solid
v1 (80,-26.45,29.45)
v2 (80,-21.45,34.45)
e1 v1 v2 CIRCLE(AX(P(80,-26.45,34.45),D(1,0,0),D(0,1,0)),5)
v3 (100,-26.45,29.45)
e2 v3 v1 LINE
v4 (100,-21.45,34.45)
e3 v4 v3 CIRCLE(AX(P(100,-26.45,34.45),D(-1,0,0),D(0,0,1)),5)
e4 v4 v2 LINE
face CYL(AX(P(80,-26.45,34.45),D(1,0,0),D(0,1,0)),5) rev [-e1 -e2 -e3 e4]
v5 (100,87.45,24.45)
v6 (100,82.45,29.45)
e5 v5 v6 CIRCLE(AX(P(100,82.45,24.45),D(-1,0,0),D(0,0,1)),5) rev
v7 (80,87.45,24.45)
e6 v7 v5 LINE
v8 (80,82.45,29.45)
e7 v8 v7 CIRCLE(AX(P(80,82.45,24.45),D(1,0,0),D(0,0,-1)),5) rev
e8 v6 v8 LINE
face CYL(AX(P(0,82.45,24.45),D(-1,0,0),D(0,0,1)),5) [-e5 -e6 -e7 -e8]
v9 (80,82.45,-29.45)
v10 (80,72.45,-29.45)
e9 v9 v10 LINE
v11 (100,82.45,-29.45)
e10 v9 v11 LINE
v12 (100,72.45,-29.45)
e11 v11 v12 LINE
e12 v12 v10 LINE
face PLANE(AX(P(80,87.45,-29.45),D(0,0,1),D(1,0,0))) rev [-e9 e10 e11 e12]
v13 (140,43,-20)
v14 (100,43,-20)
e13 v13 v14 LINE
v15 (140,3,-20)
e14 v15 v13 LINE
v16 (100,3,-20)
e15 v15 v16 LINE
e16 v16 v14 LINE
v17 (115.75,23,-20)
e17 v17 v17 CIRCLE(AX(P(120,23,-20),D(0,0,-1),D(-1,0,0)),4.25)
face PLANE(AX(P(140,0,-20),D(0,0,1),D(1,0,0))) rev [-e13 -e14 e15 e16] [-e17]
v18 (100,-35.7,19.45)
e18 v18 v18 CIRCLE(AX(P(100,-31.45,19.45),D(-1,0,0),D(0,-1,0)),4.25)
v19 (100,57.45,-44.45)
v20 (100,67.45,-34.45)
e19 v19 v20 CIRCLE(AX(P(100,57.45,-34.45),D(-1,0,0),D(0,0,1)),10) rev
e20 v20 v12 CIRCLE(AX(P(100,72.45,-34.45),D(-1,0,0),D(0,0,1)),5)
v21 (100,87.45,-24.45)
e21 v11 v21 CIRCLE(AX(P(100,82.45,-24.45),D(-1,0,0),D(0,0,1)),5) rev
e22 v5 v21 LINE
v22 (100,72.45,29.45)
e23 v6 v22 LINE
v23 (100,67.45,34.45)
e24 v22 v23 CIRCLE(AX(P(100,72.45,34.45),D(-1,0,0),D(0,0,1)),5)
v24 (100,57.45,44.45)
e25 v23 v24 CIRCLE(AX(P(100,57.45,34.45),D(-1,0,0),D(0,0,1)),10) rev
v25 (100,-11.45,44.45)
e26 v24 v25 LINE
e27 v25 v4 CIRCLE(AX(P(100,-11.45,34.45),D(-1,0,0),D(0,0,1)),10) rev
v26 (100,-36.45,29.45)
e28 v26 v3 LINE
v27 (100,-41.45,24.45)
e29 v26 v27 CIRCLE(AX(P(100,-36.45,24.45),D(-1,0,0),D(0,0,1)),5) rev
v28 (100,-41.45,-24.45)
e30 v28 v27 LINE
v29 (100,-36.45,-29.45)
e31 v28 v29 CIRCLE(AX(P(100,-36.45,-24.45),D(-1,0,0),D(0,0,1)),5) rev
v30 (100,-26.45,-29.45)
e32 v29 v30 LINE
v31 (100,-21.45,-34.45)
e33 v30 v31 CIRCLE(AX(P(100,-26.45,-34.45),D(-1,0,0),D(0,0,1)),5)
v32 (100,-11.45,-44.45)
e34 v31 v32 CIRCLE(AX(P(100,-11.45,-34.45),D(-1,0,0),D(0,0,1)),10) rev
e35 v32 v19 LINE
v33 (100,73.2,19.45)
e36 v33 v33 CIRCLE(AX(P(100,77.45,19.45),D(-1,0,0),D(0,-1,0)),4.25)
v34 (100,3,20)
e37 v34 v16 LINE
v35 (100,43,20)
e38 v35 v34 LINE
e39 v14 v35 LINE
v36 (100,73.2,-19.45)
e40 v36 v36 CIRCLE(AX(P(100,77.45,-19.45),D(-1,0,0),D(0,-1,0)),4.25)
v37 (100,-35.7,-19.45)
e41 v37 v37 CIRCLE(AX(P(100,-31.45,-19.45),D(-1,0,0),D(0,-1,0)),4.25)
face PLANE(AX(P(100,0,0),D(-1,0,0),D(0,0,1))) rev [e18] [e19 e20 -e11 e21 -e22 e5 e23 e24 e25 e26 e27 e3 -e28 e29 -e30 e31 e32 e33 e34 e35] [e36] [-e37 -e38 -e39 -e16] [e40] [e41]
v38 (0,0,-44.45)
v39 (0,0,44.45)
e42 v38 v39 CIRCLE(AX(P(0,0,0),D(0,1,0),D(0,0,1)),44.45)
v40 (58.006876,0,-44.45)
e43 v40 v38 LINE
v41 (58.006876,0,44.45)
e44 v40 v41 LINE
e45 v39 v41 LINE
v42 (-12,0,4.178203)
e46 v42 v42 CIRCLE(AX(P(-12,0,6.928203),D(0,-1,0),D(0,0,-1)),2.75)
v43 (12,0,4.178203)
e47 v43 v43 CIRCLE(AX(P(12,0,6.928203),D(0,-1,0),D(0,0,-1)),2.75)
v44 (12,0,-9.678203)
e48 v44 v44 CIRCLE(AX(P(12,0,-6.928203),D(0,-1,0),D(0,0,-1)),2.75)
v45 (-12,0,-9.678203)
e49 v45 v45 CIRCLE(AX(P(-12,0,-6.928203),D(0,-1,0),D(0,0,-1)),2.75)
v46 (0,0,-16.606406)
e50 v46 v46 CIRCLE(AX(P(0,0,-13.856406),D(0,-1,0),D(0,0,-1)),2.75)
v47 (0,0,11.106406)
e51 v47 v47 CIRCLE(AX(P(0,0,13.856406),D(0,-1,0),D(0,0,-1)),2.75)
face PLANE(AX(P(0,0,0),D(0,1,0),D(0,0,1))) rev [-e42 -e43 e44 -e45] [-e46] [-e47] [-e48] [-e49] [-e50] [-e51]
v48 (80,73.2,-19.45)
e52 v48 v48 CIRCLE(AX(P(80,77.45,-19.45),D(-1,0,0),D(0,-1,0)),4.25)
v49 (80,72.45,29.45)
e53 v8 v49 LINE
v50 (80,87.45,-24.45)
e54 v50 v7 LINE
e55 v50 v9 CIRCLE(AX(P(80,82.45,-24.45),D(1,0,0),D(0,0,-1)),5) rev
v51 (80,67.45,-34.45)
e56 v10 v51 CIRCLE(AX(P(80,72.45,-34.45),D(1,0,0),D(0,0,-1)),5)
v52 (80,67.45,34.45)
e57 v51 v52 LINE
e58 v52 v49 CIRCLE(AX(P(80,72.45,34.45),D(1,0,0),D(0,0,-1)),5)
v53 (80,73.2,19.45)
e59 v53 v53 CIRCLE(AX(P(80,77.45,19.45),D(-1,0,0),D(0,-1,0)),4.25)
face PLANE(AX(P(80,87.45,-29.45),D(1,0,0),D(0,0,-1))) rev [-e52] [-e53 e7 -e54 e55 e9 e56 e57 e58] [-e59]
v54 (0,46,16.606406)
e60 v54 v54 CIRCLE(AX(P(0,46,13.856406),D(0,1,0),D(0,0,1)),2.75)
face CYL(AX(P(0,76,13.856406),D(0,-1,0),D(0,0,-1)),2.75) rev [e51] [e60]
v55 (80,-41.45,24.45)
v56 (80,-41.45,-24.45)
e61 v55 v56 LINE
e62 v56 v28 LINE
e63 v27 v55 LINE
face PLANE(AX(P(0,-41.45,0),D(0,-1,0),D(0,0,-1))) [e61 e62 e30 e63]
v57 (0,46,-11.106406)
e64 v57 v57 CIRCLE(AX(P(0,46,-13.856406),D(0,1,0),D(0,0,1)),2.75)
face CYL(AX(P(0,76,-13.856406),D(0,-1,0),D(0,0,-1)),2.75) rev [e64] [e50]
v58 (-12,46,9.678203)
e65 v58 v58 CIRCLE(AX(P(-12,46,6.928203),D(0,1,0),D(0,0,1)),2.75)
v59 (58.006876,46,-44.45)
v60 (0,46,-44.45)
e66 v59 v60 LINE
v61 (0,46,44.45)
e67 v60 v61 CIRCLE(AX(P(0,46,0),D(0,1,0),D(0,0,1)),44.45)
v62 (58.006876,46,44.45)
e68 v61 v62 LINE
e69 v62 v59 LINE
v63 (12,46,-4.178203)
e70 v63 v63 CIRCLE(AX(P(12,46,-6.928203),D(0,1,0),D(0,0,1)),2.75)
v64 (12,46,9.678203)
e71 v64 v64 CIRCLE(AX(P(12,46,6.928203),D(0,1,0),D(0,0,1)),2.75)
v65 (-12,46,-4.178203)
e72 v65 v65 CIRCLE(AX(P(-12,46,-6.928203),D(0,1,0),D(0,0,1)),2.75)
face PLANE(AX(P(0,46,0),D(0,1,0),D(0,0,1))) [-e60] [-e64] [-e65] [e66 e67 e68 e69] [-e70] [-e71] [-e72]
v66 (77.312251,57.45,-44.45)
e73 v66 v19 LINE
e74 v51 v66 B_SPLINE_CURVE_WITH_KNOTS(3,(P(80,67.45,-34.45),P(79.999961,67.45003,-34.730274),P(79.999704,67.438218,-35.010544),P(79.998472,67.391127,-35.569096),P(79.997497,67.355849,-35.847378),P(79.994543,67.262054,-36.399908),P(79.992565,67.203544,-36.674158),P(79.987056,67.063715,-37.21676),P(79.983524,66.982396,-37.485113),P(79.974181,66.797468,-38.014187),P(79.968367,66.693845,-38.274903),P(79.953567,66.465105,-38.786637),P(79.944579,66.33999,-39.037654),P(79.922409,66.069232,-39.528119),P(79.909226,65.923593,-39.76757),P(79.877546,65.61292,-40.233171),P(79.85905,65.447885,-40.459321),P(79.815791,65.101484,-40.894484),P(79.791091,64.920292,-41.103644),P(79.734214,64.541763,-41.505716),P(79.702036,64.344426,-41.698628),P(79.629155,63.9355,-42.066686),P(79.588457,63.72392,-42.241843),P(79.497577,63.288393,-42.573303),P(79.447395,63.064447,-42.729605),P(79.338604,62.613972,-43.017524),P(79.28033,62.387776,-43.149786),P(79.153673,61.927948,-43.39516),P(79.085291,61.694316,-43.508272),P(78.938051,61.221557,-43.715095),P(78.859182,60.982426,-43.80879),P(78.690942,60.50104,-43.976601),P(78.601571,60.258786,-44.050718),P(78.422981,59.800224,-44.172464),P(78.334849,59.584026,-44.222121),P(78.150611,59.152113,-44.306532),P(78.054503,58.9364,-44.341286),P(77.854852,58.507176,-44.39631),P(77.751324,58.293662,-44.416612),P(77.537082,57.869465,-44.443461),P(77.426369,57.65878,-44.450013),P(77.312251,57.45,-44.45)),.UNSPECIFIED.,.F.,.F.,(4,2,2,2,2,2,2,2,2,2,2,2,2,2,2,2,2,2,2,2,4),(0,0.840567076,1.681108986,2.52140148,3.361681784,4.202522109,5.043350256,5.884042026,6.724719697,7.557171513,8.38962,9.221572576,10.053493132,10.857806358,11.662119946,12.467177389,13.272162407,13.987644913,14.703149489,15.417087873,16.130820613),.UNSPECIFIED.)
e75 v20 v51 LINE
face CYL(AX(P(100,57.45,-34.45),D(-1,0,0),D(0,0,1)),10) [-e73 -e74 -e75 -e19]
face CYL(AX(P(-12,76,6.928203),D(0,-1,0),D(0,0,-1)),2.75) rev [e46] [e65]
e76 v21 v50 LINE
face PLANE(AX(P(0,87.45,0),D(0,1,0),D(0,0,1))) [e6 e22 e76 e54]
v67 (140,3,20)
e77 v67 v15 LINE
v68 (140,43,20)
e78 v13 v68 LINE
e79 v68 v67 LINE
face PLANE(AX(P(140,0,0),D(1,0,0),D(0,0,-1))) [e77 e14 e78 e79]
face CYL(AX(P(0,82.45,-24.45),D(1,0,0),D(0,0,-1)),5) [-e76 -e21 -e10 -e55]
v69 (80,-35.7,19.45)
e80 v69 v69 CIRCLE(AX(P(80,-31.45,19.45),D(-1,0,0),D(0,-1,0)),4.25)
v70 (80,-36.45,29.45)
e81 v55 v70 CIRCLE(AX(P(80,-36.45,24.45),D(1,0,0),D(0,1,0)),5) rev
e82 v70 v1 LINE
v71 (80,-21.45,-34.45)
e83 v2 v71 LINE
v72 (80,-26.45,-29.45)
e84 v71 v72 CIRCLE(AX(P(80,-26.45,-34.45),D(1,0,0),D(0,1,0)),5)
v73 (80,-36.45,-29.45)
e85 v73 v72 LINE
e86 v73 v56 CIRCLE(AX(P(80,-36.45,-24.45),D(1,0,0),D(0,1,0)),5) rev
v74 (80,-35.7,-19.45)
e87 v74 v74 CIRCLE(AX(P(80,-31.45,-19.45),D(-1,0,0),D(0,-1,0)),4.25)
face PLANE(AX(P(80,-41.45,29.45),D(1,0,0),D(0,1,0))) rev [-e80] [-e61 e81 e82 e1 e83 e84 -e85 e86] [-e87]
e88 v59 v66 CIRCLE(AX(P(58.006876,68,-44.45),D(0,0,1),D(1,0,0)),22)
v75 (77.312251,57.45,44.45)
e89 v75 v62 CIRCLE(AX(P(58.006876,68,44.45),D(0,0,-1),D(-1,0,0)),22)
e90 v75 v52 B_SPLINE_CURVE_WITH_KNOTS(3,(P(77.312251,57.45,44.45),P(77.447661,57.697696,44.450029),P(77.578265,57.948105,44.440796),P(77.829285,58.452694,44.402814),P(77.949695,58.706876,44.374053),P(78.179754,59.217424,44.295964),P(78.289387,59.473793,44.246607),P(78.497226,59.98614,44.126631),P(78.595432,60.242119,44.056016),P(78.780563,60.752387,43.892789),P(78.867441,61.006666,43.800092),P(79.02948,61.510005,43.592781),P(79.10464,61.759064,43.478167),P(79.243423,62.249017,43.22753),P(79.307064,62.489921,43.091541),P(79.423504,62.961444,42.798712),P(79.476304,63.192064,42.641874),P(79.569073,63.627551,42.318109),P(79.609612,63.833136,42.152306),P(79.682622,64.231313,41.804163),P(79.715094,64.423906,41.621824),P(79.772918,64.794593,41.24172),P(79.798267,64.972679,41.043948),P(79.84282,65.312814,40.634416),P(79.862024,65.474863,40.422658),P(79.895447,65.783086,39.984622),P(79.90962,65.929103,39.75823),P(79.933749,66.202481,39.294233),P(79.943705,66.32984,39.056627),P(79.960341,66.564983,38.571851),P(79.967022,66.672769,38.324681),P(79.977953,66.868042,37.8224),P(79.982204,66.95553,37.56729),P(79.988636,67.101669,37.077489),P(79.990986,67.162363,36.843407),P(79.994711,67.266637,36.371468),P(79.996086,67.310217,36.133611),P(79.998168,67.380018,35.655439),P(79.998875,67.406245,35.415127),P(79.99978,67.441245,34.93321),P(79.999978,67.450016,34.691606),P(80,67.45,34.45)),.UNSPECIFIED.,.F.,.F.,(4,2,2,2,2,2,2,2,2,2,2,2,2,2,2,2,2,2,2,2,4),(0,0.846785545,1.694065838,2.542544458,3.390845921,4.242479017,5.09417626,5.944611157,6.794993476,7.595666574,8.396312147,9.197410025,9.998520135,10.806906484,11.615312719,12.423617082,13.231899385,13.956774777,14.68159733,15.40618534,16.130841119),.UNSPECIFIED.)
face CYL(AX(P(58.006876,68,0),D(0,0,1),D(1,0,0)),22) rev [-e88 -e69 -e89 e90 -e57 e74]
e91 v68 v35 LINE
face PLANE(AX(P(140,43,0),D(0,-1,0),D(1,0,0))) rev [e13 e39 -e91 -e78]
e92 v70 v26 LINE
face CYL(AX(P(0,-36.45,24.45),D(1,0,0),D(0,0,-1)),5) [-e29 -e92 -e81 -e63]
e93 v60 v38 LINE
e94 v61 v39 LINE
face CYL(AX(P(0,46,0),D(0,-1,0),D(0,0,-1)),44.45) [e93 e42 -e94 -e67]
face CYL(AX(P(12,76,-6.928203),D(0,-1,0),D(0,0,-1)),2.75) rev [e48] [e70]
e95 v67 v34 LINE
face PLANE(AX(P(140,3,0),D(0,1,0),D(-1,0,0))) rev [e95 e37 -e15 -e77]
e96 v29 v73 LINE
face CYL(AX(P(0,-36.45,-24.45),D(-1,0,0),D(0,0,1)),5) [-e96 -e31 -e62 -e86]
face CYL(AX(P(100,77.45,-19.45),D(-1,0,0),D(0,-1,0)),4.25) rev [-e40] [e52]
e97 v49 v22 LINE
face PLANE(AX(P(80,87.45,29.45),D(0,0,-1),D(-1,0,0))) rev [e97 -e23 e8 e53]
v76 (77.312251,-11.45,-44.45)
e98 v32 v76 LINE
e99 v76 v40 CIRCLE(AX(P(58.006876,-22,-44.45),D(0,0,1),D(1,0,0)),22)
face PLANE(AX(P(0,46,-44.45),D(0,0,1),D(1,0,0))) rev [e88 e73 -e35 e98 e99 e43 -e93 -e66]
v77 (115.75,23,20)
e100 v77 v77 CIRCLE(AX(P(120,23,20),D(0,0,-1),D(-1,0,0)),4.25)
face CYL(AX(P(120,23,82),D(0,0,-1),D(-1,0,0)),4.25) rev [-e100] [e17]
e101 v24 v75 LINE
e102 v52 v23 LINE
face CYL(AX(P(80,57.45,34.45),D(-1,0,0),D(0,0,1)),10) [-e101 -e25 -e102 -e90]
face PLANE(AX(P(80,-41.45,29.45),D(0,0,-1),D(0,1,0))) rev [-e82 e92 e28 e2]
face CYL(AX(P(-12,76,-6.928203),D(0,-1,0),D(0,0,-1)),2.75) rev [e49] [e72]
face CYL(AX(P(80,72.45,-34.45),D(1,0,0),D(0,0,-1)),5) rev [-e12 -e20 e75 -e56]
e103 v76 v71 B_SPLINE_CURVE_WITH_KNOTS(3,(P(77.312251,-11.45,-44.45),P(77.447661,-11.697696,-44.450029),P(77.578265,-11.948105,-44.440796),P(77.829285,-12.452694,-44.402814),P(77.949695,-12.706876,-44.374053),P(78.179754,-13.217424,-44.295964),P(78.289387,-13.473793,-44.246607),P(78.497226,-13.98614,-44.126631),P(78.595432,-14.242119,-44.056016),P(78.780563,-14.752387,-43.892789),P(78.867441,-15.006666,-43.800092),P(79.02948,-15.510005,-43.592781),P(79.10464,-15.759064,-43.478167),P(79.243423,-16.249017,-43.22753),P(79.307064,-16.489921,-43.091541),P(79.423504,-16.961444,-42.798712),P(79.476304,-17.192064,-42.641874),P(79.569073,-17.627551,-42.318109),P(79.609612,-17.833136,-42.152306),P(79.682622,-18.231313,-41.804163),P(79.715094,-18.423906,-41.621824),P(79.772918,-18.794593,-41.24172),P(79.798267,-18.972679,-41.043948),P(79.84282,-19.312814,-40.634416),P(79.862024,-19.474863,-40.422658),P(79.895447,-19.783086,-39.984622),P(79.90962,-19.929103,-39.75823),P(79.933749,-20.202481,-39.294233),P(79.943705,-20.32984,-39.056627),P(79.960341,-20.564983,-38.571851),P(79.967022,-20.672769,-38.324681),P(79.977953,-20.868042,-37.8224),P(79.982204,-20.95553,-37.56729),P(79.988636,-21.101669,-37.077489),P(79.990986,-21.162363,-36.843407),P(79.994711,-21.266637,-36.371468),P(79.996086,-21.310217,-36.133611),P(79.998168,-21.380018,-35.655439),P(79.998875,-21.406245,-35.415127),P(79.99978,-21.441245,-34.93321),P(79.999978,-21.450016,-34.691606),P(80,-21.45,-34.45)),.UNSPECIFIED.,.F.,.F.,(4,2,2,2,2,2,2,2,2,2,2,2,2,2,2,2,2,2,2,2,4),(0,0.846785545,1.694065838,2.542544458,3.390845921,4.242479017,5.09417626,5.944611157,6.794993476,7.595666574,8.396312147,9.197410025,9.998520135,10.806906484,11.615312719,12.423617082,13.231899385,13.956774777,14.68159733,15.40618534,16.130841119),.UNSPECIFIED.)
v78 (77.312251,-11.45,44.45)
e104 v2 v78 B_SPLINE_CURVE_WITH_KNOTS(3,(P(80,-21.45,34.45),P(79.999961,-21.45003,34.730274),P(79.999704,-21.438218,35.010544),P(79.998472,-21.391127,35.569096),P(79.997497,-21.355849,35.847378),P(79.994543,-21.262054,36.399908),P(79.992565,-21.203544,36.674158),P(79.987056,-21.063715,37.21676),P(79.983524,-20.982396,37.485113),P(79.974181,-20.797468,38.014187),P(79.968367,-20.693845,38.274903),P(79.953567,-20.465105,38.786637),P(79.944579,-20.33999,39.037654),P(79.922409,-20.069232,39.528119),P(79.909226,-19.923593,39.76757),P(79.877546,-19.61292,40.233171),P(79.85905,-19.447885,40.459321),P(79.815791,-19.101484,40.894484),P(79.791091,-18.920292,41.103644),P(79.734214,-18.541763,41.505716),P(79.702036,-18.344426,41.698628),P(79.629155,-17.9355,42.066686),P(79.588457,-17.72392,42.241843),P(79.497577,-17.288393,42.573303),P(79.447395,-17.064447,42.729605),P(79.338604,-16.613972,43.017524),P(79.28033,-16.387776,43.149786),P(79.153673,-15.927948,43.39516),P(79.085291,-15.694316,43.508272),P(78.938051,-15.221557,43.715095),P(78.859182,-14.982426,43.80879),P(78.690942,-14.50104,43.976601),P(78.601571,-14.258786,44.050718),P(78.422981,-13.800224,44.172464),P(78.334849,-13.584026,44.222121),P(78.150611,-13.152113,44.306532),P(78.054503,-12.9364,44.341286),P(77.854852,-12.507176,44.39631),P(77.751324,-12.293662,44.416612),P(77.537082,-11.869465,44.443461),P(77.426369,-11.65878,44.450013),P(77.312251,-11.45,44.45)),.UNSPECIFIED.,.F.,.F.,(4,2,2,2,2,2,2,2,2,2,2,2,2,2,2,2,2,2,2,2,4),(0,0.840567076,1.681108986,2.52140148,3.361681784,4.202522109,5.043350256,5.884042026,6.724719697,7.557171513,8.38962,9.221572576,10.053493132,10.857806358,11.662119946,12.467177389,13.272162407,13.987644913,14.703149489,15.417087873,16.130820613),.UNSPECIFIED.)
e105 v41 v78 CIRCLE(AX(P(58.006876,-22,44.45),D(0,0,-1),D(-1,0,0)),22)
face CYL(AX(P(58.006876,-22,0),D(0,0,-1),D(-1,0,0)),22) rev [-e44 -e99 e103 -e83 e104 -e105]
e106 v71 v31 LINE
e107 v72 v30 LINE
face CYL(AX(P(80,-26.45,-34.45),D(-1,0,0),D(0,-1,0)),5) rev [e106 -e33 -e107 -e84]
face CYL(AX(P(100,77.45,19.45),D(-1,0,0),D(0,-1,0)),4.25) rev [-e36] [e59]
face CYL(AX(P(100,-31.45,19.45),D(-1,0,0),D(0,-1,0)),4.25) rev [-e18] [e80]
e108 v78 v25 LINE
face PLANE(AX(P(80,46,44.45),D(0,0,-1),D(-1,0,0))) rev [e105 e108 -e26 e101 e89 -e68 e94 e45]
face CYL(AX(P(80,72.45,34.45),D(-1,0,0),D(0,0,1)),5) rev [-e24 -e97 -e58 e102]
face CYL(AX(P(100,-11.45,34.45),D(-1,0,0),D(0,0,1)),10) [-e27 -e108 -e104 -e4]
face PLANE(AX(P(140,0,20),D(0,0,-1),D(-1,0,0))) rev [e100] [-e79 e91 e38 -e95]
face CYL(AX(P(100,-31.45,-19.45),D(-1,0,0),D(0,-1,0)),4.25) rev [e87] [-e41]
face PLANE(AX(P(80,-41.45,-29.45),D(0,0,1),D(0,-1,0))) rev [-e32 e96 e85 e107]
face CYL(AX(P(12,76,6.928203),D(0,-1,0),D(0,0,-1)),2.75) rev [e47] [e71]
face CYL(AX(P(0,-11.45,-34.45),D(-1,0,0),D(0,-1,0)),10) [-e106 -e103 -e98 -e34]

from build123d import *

# Parameters (mm, degrees)
BOSS_EXTRUDE1_DEPTH = 46
CUT_EXTRUDE2_DEPTH  = 76
SKETCH3_W           = 88.9
SKETCH3_H           = 88.9
BOSS_EXTRUDE2_DEPTH = 20
FILLET1_R           = 22
BOSS_EXTRUDE3_DEPTH = 40
SKETCH7_W           = 20
SKETCH7_H           = 20
BOSS_EXTRUDE4_DEPTH = 20
SKETCH8_W           = 20
SKETCH8_H           = 20
BOSS_EXTRUDE5_DEPTH = 20
FILLET3_R           = 10
SKETCH10_R          = 4.25
CUT_EXTRUDE4_DEPTH  = 20
SKETCH11_R          = 4.25
CUT_EXTRUDE5_DEPTH  = 102
SKETCH12_W          = 18.9
SKETCH12_H          = 20
BOSS_EXTRUDE6_DEPTH = 20
FILLET4_START       = 79
FILLET4_DEPTH       = 22
FILLET4_START_2     = 80
FILLET4_2_DEPTH     = 20


with BuildPart() as part:
    # Sketch1 → Boss-Extrude1 (new body)
    with BuildSketch(Plane(origin=(0, 0, 0), x_dir=(1, 0, 0), z_dir=(0, 1, 0))):
        with BuildLine():
            Line((0, 44.45), (80, 44.45))
            Line((80, 44.45), (80, -44.45))
            Line((80, -44.45), (0, -44.45))
            ThreePointArc((0, -44.45), (-44.45, 0), (0, 44.45))
        make_face()
    extrude(amount=BOSS_EXTRUDE1_DEPTH)

    # Sketch2 → Cut-Extrude2 (cut)
    with BuildSketch(Plane(origin=(0, 0, 0), x_dir=(-1, 0, 0), z_dir=(0, -1, 0))):
        with BuildLine():
            Line((-2.38156986, -12.481406461), (0, -13.856406461))
            Line((0, -13.856406461), (2.38156986, -12.481406461))
            ThreePointArc((2.38156986, -12.481406461), (0, -11.106406461), (-2.38156986, -12.481406461))
        make_face()
        with BuildLine():
            Line((2.38156986, -12.481406461), (0, -13.856406461))
            Line((0, -13.856406461), (-2.38156986, -12.481406461))
            ThreePointArc((-2.38156986, -12.481406461), (-0.711752374, -16.512702483), (2.75, -13.856406461))
            ThreePointArc((2.75, -13.856406461), (2.656296022, -13.144654087), (2.38156986, -12.481406461))
        make_face()
        with BuildLine():
            ThreePointArc((-12, -4.17820323), (-14.38156986, -8.30320323), (-9.61843014, -8.30320323))
            Line((-9.61843014, -8.30320323), (-12, -6.92820323))
            Line((-12, -6.92820323), (-12, -4.17820323))
        make_face()
        with BuildLine():
            Line((-12, -6.92820323), (-9.61843014, -8.30320323))
            ThreePointArc((-9.61843014, -8.30320323), (-9.343703978, -7.639955604), (-9.25, -6.92820323))
            ThreePointArc((-9.25, -6.92820323), (-10.055456352, -4.983659582), (-12, -4.17820323))
            Line((-12, -4.17820323), (-12, -6.92820323))
        make_face()
        with BuildLine():
            ThreePointArc((-9.61843014, 8.30320323), (-14.38156986, 8.30320323), (-12, 4.17820323))
            Line((-12, 4.17820323), (-12, 6.92820323))
            Line((-12, 6.92820323), (-9.61843014, 8.30320323))
        make_face()
        with BuildLine():
            Line((-12, 6.92820323), (-12, 4.17820323))
            ThreePointArc((-12, 4.17820323), (-10.055456352, 4.983659582), (-9.25, 6.92820323))
            ThreePointArc((-9.25, 6.92820323), (-9.343703978, 7.639955604), (-9.61843014, 8.30320323))
            Line((-9.61843014, 8.30320323), (-12, 6.92820323))
        make_face()
        with BuildLine():
            ThreePointArc((-2.38156986, 12.481406461), (0, 11.106406461), (2.38156986, 12.481406461))
            Line((2.38156986, 12.481406461), (0, 13.856406461))
            Line((0, 13.856406461), (-2.38156986, 12.481406461))
        make_face()
        with BuildLine():
            Line((0, 13.856406461), (2.38156986, 12.481406461))
            ThreePointArc((2.38156986, 12.481406461), (2.656296022, 13.144654087), (2.75, 13.856406461))
            ThreePointArc((2.75, 13.856406461), (-0.711752374, 16.512702483), (-2.38156986, 12.481406461))
            Line((-2.38156986, 12.481406461), (0, 13.856406461))
        make_face()
        with BuildLine():
            ThreePointArc((9.61843014, 8.30320323), (9.61843014, 5.55320323), (12, 4.17820323))
            Line((12, 4.17820323), (12, 6.92820323))
            Line((12, 6.92820323), (9.61843014, 8.30320323))
        make_face()
        with BuildLine():
            Line((12, 6.92820323), (12, 4.17820323))
            ThreePointArc((12, 4.17820323), (13.944543648, 4.983659582), (14.75, 6.92820323))
            ThreePointArc((14.75, 6.92820323), (12.711752374, 9.584499253), (9.61843014, 8.30320323))
            Line((9.61843014, 8.30320323), (12, 6.92820323))
        make_face()
        with BuildLine():
            ThreePointArc((12, -4.17820323), (9.61843014, -5.55320323), (9.61843014, -8.30320323))
            Line((9.61843014, -8.30320323), (12, -6.92820323))
            Line((12, -6.92820323), (12, -4.17820323))
        make_face()
        with BuildLine():
            Line((12, -6.92820323), (9.61843014, -8.30320323))
            ThreePointArc((9.61843014, -8.30320323), (12.711752374, -9.584499253), (14.75, -6.92820323))
            ThreePointArc((14.75, -6.92820323), (13.944543648, -4.983659582), (12, -4.17820323))
            Line((12, -4.17820323), (12, -6.92820323))
        make_face()
    extrude(amount=-CUT_EXTRUDE2_DEPTH, mode=Mode.SUBTRACT)

    # Sketch3 → Boss-Extrude2 (add)
    with BuildSketch(Plane(origin=(80, 0, 0), x_dir=(0, 0, -1), z_dir=(1, 0, 0))):
        with Locations((0, 23)):
            Rectangle(SKETCH3_W, SKETCH3_H)
    extrude(amount=BOSS_EXTRUDE2_DEPTH)

    # Fillet1
    # the kernel refuses this fillet: 22 mm, written as the material it adds along each edge
    with BuildSketch(Plane(origin=(80, 46, -44.45), x_dir=(0, 1, 0), z_dir=(0, 0, 1))) as fillet1_piece_1:
        with BuildLine():
            CenterArc((22, 21.993123925), FILLET1_R, 180, 88.567456262)
            Line((0, 21.993123925), (-0.44, 21.993123925))
            Line((-0.44, 21.993123925), (-0.44, 0))
            Line((-0.44, 0), (0, -0.44))
            ThreePointArc((0, -0.44), (10.725, -0.44), (21.439, -0.439862479))
            Line((21.439, -0.439862479), (21.45, 0))
        make_face()
    extrude(amount=88.9)
    with BuildSketch(Plane(origin=(80, 0, -44.45), x_dir=(0, -1, 0), z_dir=(0, 0, 1))) as fillet1_piece_2:
        with BuildLine():
            CenterArc((22, -21.993123925), FILLET1_R, 91.432543738, 88.567456262)
            Line((0, -21.993123925), (-0.44, -21.993123925))
            Line((-0.44, -21.993123925), (-0.44, 0))
            Line((-0.44, 0), (0, 0.44))
            ThreePointArc((0, 0.44), (10.725, 0.44), (21.439, 0.439862479))
            Line((21.439, 0.439862479), (21.45, 0))
        make_face()
    extrude(amount=88.9)

    # Sketch5 → Boss-Extrude3 (add)
    with BuildSketch(Plane(origin=(100, 0, 0), x_dir=(0, 0, -1), z_dir=(1, 0, 0))):
        Polygon((20, 43), (0, 43), (-20, 43), (-20, 3), (20, 3), align=None)
    extrude(amount=BOSS_EXTRUDE3_DEPTH)

    # Sketch7 → Boss-Extrude4 (add)
    with BuildSketch(Plane(origin=(0, 67.45, 0), x_dir=(1, 0, 0), z_dir=(0, 1, 0))):
        with Locations((90, 19.45)):
            Rectangle(SKETCH7_W, SKETCH7_H)
        with Locations((90, -19.45)):
            Rectangle(SKETCH7_W, SKETCH7_H)
    extrude(amount=BOSS_EXTRUDE4_DEPTH)

    # Sketch8 → Boss-Extrude5 (add)
    with BuildSketch(Plane.XZ.offset(21.45)):
        with Locations((90, 19.45)):
            Rectangle(SKETCH8_W, SKETCH8_H)
        with Locations((90, -19.45)):
            Rectangle(SKETCH8_W, SKETCH8_H)
    extrude(amount=BOSS_EXTRUDE5_DEPTH)

    # Fillet3
    fillet3_edges = [part.edges().sort_by_distance(p)[0] for p in [
        (90, -21.45, 44.45),
        (90, -21.45, -44.45),
        (90, 67.45, -44.45),
        (90, 67.45, 44.45),
    ]]
    fillet(fillet3_edges, radius=FILLET3_R)

    # Sketch10 → Cut-Extrude4 (cut)
    with BuildSketch(Plane.ZY.offset(-80)):
        with Locations(Location((-19.45, 77.45, 0), (0, 0, 270))):
            Circle(SKETCH10_R)
        with Locations(Location((19.45, 77.45, 0), (0, 0, 270))):
            Circle(SKETCH10_R)
        with Locations(Location((19.45, -31.45, 0), (0, 0, 270))):
            Circle(SKETCH10_R)
        with Locations(Location((-19.45, -31.45, 0), (0, 0, 270))):
            Circle(SKETCH10_R)
    extrude(amount=-CUT_EXTRUDE4_DEPTH, mode=Mode.SUBTRACT)

    # Sketch11 → Cut-Extrude5 (cut)
    with BuildSketch(Plane(origin=(0, 0, -20), x_dir=(-1, 0, 0), z_dir=(0, 0, -1))):
        with Locations((-120, 23)):
            Circle(SKETCH11_R)
    extrude(amount=-CUT_EXTRUDE5_DEPTH, mode=Mode.SUBTRACT)

    # Sketch12 → Boss-Extrude6 (add)
    with BuildSketch(Plane(origin=(100, 0, 0), x_dir=(0, 0, -1), z_dir=(1, 0, 0))):
        with Locations((0, 77.45)):
            Rectangle(SKETCH12_W, SKETCH12_H)
        with Locations((0, -31.45)):
            Rectangle(SKETCH12_W, SKETCH12_H)
    extrude(amount=-BOSS_EXTRUDE6_DEPTH)

    # Fillet4: read off the stored shape, not the designer's step
    # Fillet4 outline → Fillet4 (cut)
    with BuildSketch(Plane.YZ.offset(FILLET4_START)):
        with BuildLine():
            ThreePointArc((82.45, 29.45), (85.985533906, 27.985533906), (87.45, 24.45))
            Line((87.45, 24.45), (87.45, 29.45))
            Line((87.45, 29.45), (82.45, 29.45))
        make_face()
        with BuildLine():
            ThreePointArc((87.45, -24.45), (85.985533906, -27.985533906), (82.45, -29.45))
            Line((82.45, -29.45), (87.45, -29.45))
            Line((87.45, -29.45), (87.45, -24.45))
        make_face()
        with BuildLine():
            Line((-41.45, -29.45), (-36.45, -29.45))
            ThreePointArc((-36.45, -29.45), (-39.985533906, -27.985533906), (-41.45, -24.45))
            Line((-41.45, -24.45), (-41.45, -29.45))
        make_face()
        with BuildLine():
            Line((-41.45, 29.45), (-41.45, 24.45))
            ThreePointArc((-41.45, 24.45), (-39.985533906, 27.985533906), (-36.45, 29.45))
            Line((-36.45, 29.45), (-41.45, 29.45))
        make_face()
    extrude(amount=FILLET4_DEPTH, mode=Mode.SUBTRACT)

    # Fillet4 2 outline → Fillet4 2 (add)
    with BuildSketch(Plane.YZ.offset(FILLET4_START_2)):
        with BuildLine():
            Line((67.45, 29.45), (72.45, 29.45))
            ThreePointArc((72.45, 29.45), (68.914466094, 30.914466094), (67.45, 34.45))
            Line((67.45, 34.45), (67.45, 29.45))
        make_face()
        with BuildLine():
            ThreePointArc((67.45, -34.45), (68.914466094, -30.914466094), (72.45, -29.45))
            Line((72.45, -29.45), (67.45, -29.45))
            Line((67.45, -29.45), (67.45, -34.45))
        make_face()
        with BuildLine():
            Line((-21.45, -29.45), (-26.45, -29.45))
            ThreePointArc((-26.45, -29.45), (-22.914466094, -30.914466094), (-21.45, -34.45))
            Line((-21.45, -34.45), (-21.45, -29.45))
        make_face()
        with BuildLine():
            ThreePointArc((-21.45, 34.45), (-22.914466094, 30.914466094), (-26.45, 29.45))
            Line((-26.45, 29.45), (-21.45, 29.45))
            Line((-21.45, 29.45), (-21.45, 34.45))
        make_face()
    extrude(amount=FILLET4_2_DEPTH)


solid = part.part
